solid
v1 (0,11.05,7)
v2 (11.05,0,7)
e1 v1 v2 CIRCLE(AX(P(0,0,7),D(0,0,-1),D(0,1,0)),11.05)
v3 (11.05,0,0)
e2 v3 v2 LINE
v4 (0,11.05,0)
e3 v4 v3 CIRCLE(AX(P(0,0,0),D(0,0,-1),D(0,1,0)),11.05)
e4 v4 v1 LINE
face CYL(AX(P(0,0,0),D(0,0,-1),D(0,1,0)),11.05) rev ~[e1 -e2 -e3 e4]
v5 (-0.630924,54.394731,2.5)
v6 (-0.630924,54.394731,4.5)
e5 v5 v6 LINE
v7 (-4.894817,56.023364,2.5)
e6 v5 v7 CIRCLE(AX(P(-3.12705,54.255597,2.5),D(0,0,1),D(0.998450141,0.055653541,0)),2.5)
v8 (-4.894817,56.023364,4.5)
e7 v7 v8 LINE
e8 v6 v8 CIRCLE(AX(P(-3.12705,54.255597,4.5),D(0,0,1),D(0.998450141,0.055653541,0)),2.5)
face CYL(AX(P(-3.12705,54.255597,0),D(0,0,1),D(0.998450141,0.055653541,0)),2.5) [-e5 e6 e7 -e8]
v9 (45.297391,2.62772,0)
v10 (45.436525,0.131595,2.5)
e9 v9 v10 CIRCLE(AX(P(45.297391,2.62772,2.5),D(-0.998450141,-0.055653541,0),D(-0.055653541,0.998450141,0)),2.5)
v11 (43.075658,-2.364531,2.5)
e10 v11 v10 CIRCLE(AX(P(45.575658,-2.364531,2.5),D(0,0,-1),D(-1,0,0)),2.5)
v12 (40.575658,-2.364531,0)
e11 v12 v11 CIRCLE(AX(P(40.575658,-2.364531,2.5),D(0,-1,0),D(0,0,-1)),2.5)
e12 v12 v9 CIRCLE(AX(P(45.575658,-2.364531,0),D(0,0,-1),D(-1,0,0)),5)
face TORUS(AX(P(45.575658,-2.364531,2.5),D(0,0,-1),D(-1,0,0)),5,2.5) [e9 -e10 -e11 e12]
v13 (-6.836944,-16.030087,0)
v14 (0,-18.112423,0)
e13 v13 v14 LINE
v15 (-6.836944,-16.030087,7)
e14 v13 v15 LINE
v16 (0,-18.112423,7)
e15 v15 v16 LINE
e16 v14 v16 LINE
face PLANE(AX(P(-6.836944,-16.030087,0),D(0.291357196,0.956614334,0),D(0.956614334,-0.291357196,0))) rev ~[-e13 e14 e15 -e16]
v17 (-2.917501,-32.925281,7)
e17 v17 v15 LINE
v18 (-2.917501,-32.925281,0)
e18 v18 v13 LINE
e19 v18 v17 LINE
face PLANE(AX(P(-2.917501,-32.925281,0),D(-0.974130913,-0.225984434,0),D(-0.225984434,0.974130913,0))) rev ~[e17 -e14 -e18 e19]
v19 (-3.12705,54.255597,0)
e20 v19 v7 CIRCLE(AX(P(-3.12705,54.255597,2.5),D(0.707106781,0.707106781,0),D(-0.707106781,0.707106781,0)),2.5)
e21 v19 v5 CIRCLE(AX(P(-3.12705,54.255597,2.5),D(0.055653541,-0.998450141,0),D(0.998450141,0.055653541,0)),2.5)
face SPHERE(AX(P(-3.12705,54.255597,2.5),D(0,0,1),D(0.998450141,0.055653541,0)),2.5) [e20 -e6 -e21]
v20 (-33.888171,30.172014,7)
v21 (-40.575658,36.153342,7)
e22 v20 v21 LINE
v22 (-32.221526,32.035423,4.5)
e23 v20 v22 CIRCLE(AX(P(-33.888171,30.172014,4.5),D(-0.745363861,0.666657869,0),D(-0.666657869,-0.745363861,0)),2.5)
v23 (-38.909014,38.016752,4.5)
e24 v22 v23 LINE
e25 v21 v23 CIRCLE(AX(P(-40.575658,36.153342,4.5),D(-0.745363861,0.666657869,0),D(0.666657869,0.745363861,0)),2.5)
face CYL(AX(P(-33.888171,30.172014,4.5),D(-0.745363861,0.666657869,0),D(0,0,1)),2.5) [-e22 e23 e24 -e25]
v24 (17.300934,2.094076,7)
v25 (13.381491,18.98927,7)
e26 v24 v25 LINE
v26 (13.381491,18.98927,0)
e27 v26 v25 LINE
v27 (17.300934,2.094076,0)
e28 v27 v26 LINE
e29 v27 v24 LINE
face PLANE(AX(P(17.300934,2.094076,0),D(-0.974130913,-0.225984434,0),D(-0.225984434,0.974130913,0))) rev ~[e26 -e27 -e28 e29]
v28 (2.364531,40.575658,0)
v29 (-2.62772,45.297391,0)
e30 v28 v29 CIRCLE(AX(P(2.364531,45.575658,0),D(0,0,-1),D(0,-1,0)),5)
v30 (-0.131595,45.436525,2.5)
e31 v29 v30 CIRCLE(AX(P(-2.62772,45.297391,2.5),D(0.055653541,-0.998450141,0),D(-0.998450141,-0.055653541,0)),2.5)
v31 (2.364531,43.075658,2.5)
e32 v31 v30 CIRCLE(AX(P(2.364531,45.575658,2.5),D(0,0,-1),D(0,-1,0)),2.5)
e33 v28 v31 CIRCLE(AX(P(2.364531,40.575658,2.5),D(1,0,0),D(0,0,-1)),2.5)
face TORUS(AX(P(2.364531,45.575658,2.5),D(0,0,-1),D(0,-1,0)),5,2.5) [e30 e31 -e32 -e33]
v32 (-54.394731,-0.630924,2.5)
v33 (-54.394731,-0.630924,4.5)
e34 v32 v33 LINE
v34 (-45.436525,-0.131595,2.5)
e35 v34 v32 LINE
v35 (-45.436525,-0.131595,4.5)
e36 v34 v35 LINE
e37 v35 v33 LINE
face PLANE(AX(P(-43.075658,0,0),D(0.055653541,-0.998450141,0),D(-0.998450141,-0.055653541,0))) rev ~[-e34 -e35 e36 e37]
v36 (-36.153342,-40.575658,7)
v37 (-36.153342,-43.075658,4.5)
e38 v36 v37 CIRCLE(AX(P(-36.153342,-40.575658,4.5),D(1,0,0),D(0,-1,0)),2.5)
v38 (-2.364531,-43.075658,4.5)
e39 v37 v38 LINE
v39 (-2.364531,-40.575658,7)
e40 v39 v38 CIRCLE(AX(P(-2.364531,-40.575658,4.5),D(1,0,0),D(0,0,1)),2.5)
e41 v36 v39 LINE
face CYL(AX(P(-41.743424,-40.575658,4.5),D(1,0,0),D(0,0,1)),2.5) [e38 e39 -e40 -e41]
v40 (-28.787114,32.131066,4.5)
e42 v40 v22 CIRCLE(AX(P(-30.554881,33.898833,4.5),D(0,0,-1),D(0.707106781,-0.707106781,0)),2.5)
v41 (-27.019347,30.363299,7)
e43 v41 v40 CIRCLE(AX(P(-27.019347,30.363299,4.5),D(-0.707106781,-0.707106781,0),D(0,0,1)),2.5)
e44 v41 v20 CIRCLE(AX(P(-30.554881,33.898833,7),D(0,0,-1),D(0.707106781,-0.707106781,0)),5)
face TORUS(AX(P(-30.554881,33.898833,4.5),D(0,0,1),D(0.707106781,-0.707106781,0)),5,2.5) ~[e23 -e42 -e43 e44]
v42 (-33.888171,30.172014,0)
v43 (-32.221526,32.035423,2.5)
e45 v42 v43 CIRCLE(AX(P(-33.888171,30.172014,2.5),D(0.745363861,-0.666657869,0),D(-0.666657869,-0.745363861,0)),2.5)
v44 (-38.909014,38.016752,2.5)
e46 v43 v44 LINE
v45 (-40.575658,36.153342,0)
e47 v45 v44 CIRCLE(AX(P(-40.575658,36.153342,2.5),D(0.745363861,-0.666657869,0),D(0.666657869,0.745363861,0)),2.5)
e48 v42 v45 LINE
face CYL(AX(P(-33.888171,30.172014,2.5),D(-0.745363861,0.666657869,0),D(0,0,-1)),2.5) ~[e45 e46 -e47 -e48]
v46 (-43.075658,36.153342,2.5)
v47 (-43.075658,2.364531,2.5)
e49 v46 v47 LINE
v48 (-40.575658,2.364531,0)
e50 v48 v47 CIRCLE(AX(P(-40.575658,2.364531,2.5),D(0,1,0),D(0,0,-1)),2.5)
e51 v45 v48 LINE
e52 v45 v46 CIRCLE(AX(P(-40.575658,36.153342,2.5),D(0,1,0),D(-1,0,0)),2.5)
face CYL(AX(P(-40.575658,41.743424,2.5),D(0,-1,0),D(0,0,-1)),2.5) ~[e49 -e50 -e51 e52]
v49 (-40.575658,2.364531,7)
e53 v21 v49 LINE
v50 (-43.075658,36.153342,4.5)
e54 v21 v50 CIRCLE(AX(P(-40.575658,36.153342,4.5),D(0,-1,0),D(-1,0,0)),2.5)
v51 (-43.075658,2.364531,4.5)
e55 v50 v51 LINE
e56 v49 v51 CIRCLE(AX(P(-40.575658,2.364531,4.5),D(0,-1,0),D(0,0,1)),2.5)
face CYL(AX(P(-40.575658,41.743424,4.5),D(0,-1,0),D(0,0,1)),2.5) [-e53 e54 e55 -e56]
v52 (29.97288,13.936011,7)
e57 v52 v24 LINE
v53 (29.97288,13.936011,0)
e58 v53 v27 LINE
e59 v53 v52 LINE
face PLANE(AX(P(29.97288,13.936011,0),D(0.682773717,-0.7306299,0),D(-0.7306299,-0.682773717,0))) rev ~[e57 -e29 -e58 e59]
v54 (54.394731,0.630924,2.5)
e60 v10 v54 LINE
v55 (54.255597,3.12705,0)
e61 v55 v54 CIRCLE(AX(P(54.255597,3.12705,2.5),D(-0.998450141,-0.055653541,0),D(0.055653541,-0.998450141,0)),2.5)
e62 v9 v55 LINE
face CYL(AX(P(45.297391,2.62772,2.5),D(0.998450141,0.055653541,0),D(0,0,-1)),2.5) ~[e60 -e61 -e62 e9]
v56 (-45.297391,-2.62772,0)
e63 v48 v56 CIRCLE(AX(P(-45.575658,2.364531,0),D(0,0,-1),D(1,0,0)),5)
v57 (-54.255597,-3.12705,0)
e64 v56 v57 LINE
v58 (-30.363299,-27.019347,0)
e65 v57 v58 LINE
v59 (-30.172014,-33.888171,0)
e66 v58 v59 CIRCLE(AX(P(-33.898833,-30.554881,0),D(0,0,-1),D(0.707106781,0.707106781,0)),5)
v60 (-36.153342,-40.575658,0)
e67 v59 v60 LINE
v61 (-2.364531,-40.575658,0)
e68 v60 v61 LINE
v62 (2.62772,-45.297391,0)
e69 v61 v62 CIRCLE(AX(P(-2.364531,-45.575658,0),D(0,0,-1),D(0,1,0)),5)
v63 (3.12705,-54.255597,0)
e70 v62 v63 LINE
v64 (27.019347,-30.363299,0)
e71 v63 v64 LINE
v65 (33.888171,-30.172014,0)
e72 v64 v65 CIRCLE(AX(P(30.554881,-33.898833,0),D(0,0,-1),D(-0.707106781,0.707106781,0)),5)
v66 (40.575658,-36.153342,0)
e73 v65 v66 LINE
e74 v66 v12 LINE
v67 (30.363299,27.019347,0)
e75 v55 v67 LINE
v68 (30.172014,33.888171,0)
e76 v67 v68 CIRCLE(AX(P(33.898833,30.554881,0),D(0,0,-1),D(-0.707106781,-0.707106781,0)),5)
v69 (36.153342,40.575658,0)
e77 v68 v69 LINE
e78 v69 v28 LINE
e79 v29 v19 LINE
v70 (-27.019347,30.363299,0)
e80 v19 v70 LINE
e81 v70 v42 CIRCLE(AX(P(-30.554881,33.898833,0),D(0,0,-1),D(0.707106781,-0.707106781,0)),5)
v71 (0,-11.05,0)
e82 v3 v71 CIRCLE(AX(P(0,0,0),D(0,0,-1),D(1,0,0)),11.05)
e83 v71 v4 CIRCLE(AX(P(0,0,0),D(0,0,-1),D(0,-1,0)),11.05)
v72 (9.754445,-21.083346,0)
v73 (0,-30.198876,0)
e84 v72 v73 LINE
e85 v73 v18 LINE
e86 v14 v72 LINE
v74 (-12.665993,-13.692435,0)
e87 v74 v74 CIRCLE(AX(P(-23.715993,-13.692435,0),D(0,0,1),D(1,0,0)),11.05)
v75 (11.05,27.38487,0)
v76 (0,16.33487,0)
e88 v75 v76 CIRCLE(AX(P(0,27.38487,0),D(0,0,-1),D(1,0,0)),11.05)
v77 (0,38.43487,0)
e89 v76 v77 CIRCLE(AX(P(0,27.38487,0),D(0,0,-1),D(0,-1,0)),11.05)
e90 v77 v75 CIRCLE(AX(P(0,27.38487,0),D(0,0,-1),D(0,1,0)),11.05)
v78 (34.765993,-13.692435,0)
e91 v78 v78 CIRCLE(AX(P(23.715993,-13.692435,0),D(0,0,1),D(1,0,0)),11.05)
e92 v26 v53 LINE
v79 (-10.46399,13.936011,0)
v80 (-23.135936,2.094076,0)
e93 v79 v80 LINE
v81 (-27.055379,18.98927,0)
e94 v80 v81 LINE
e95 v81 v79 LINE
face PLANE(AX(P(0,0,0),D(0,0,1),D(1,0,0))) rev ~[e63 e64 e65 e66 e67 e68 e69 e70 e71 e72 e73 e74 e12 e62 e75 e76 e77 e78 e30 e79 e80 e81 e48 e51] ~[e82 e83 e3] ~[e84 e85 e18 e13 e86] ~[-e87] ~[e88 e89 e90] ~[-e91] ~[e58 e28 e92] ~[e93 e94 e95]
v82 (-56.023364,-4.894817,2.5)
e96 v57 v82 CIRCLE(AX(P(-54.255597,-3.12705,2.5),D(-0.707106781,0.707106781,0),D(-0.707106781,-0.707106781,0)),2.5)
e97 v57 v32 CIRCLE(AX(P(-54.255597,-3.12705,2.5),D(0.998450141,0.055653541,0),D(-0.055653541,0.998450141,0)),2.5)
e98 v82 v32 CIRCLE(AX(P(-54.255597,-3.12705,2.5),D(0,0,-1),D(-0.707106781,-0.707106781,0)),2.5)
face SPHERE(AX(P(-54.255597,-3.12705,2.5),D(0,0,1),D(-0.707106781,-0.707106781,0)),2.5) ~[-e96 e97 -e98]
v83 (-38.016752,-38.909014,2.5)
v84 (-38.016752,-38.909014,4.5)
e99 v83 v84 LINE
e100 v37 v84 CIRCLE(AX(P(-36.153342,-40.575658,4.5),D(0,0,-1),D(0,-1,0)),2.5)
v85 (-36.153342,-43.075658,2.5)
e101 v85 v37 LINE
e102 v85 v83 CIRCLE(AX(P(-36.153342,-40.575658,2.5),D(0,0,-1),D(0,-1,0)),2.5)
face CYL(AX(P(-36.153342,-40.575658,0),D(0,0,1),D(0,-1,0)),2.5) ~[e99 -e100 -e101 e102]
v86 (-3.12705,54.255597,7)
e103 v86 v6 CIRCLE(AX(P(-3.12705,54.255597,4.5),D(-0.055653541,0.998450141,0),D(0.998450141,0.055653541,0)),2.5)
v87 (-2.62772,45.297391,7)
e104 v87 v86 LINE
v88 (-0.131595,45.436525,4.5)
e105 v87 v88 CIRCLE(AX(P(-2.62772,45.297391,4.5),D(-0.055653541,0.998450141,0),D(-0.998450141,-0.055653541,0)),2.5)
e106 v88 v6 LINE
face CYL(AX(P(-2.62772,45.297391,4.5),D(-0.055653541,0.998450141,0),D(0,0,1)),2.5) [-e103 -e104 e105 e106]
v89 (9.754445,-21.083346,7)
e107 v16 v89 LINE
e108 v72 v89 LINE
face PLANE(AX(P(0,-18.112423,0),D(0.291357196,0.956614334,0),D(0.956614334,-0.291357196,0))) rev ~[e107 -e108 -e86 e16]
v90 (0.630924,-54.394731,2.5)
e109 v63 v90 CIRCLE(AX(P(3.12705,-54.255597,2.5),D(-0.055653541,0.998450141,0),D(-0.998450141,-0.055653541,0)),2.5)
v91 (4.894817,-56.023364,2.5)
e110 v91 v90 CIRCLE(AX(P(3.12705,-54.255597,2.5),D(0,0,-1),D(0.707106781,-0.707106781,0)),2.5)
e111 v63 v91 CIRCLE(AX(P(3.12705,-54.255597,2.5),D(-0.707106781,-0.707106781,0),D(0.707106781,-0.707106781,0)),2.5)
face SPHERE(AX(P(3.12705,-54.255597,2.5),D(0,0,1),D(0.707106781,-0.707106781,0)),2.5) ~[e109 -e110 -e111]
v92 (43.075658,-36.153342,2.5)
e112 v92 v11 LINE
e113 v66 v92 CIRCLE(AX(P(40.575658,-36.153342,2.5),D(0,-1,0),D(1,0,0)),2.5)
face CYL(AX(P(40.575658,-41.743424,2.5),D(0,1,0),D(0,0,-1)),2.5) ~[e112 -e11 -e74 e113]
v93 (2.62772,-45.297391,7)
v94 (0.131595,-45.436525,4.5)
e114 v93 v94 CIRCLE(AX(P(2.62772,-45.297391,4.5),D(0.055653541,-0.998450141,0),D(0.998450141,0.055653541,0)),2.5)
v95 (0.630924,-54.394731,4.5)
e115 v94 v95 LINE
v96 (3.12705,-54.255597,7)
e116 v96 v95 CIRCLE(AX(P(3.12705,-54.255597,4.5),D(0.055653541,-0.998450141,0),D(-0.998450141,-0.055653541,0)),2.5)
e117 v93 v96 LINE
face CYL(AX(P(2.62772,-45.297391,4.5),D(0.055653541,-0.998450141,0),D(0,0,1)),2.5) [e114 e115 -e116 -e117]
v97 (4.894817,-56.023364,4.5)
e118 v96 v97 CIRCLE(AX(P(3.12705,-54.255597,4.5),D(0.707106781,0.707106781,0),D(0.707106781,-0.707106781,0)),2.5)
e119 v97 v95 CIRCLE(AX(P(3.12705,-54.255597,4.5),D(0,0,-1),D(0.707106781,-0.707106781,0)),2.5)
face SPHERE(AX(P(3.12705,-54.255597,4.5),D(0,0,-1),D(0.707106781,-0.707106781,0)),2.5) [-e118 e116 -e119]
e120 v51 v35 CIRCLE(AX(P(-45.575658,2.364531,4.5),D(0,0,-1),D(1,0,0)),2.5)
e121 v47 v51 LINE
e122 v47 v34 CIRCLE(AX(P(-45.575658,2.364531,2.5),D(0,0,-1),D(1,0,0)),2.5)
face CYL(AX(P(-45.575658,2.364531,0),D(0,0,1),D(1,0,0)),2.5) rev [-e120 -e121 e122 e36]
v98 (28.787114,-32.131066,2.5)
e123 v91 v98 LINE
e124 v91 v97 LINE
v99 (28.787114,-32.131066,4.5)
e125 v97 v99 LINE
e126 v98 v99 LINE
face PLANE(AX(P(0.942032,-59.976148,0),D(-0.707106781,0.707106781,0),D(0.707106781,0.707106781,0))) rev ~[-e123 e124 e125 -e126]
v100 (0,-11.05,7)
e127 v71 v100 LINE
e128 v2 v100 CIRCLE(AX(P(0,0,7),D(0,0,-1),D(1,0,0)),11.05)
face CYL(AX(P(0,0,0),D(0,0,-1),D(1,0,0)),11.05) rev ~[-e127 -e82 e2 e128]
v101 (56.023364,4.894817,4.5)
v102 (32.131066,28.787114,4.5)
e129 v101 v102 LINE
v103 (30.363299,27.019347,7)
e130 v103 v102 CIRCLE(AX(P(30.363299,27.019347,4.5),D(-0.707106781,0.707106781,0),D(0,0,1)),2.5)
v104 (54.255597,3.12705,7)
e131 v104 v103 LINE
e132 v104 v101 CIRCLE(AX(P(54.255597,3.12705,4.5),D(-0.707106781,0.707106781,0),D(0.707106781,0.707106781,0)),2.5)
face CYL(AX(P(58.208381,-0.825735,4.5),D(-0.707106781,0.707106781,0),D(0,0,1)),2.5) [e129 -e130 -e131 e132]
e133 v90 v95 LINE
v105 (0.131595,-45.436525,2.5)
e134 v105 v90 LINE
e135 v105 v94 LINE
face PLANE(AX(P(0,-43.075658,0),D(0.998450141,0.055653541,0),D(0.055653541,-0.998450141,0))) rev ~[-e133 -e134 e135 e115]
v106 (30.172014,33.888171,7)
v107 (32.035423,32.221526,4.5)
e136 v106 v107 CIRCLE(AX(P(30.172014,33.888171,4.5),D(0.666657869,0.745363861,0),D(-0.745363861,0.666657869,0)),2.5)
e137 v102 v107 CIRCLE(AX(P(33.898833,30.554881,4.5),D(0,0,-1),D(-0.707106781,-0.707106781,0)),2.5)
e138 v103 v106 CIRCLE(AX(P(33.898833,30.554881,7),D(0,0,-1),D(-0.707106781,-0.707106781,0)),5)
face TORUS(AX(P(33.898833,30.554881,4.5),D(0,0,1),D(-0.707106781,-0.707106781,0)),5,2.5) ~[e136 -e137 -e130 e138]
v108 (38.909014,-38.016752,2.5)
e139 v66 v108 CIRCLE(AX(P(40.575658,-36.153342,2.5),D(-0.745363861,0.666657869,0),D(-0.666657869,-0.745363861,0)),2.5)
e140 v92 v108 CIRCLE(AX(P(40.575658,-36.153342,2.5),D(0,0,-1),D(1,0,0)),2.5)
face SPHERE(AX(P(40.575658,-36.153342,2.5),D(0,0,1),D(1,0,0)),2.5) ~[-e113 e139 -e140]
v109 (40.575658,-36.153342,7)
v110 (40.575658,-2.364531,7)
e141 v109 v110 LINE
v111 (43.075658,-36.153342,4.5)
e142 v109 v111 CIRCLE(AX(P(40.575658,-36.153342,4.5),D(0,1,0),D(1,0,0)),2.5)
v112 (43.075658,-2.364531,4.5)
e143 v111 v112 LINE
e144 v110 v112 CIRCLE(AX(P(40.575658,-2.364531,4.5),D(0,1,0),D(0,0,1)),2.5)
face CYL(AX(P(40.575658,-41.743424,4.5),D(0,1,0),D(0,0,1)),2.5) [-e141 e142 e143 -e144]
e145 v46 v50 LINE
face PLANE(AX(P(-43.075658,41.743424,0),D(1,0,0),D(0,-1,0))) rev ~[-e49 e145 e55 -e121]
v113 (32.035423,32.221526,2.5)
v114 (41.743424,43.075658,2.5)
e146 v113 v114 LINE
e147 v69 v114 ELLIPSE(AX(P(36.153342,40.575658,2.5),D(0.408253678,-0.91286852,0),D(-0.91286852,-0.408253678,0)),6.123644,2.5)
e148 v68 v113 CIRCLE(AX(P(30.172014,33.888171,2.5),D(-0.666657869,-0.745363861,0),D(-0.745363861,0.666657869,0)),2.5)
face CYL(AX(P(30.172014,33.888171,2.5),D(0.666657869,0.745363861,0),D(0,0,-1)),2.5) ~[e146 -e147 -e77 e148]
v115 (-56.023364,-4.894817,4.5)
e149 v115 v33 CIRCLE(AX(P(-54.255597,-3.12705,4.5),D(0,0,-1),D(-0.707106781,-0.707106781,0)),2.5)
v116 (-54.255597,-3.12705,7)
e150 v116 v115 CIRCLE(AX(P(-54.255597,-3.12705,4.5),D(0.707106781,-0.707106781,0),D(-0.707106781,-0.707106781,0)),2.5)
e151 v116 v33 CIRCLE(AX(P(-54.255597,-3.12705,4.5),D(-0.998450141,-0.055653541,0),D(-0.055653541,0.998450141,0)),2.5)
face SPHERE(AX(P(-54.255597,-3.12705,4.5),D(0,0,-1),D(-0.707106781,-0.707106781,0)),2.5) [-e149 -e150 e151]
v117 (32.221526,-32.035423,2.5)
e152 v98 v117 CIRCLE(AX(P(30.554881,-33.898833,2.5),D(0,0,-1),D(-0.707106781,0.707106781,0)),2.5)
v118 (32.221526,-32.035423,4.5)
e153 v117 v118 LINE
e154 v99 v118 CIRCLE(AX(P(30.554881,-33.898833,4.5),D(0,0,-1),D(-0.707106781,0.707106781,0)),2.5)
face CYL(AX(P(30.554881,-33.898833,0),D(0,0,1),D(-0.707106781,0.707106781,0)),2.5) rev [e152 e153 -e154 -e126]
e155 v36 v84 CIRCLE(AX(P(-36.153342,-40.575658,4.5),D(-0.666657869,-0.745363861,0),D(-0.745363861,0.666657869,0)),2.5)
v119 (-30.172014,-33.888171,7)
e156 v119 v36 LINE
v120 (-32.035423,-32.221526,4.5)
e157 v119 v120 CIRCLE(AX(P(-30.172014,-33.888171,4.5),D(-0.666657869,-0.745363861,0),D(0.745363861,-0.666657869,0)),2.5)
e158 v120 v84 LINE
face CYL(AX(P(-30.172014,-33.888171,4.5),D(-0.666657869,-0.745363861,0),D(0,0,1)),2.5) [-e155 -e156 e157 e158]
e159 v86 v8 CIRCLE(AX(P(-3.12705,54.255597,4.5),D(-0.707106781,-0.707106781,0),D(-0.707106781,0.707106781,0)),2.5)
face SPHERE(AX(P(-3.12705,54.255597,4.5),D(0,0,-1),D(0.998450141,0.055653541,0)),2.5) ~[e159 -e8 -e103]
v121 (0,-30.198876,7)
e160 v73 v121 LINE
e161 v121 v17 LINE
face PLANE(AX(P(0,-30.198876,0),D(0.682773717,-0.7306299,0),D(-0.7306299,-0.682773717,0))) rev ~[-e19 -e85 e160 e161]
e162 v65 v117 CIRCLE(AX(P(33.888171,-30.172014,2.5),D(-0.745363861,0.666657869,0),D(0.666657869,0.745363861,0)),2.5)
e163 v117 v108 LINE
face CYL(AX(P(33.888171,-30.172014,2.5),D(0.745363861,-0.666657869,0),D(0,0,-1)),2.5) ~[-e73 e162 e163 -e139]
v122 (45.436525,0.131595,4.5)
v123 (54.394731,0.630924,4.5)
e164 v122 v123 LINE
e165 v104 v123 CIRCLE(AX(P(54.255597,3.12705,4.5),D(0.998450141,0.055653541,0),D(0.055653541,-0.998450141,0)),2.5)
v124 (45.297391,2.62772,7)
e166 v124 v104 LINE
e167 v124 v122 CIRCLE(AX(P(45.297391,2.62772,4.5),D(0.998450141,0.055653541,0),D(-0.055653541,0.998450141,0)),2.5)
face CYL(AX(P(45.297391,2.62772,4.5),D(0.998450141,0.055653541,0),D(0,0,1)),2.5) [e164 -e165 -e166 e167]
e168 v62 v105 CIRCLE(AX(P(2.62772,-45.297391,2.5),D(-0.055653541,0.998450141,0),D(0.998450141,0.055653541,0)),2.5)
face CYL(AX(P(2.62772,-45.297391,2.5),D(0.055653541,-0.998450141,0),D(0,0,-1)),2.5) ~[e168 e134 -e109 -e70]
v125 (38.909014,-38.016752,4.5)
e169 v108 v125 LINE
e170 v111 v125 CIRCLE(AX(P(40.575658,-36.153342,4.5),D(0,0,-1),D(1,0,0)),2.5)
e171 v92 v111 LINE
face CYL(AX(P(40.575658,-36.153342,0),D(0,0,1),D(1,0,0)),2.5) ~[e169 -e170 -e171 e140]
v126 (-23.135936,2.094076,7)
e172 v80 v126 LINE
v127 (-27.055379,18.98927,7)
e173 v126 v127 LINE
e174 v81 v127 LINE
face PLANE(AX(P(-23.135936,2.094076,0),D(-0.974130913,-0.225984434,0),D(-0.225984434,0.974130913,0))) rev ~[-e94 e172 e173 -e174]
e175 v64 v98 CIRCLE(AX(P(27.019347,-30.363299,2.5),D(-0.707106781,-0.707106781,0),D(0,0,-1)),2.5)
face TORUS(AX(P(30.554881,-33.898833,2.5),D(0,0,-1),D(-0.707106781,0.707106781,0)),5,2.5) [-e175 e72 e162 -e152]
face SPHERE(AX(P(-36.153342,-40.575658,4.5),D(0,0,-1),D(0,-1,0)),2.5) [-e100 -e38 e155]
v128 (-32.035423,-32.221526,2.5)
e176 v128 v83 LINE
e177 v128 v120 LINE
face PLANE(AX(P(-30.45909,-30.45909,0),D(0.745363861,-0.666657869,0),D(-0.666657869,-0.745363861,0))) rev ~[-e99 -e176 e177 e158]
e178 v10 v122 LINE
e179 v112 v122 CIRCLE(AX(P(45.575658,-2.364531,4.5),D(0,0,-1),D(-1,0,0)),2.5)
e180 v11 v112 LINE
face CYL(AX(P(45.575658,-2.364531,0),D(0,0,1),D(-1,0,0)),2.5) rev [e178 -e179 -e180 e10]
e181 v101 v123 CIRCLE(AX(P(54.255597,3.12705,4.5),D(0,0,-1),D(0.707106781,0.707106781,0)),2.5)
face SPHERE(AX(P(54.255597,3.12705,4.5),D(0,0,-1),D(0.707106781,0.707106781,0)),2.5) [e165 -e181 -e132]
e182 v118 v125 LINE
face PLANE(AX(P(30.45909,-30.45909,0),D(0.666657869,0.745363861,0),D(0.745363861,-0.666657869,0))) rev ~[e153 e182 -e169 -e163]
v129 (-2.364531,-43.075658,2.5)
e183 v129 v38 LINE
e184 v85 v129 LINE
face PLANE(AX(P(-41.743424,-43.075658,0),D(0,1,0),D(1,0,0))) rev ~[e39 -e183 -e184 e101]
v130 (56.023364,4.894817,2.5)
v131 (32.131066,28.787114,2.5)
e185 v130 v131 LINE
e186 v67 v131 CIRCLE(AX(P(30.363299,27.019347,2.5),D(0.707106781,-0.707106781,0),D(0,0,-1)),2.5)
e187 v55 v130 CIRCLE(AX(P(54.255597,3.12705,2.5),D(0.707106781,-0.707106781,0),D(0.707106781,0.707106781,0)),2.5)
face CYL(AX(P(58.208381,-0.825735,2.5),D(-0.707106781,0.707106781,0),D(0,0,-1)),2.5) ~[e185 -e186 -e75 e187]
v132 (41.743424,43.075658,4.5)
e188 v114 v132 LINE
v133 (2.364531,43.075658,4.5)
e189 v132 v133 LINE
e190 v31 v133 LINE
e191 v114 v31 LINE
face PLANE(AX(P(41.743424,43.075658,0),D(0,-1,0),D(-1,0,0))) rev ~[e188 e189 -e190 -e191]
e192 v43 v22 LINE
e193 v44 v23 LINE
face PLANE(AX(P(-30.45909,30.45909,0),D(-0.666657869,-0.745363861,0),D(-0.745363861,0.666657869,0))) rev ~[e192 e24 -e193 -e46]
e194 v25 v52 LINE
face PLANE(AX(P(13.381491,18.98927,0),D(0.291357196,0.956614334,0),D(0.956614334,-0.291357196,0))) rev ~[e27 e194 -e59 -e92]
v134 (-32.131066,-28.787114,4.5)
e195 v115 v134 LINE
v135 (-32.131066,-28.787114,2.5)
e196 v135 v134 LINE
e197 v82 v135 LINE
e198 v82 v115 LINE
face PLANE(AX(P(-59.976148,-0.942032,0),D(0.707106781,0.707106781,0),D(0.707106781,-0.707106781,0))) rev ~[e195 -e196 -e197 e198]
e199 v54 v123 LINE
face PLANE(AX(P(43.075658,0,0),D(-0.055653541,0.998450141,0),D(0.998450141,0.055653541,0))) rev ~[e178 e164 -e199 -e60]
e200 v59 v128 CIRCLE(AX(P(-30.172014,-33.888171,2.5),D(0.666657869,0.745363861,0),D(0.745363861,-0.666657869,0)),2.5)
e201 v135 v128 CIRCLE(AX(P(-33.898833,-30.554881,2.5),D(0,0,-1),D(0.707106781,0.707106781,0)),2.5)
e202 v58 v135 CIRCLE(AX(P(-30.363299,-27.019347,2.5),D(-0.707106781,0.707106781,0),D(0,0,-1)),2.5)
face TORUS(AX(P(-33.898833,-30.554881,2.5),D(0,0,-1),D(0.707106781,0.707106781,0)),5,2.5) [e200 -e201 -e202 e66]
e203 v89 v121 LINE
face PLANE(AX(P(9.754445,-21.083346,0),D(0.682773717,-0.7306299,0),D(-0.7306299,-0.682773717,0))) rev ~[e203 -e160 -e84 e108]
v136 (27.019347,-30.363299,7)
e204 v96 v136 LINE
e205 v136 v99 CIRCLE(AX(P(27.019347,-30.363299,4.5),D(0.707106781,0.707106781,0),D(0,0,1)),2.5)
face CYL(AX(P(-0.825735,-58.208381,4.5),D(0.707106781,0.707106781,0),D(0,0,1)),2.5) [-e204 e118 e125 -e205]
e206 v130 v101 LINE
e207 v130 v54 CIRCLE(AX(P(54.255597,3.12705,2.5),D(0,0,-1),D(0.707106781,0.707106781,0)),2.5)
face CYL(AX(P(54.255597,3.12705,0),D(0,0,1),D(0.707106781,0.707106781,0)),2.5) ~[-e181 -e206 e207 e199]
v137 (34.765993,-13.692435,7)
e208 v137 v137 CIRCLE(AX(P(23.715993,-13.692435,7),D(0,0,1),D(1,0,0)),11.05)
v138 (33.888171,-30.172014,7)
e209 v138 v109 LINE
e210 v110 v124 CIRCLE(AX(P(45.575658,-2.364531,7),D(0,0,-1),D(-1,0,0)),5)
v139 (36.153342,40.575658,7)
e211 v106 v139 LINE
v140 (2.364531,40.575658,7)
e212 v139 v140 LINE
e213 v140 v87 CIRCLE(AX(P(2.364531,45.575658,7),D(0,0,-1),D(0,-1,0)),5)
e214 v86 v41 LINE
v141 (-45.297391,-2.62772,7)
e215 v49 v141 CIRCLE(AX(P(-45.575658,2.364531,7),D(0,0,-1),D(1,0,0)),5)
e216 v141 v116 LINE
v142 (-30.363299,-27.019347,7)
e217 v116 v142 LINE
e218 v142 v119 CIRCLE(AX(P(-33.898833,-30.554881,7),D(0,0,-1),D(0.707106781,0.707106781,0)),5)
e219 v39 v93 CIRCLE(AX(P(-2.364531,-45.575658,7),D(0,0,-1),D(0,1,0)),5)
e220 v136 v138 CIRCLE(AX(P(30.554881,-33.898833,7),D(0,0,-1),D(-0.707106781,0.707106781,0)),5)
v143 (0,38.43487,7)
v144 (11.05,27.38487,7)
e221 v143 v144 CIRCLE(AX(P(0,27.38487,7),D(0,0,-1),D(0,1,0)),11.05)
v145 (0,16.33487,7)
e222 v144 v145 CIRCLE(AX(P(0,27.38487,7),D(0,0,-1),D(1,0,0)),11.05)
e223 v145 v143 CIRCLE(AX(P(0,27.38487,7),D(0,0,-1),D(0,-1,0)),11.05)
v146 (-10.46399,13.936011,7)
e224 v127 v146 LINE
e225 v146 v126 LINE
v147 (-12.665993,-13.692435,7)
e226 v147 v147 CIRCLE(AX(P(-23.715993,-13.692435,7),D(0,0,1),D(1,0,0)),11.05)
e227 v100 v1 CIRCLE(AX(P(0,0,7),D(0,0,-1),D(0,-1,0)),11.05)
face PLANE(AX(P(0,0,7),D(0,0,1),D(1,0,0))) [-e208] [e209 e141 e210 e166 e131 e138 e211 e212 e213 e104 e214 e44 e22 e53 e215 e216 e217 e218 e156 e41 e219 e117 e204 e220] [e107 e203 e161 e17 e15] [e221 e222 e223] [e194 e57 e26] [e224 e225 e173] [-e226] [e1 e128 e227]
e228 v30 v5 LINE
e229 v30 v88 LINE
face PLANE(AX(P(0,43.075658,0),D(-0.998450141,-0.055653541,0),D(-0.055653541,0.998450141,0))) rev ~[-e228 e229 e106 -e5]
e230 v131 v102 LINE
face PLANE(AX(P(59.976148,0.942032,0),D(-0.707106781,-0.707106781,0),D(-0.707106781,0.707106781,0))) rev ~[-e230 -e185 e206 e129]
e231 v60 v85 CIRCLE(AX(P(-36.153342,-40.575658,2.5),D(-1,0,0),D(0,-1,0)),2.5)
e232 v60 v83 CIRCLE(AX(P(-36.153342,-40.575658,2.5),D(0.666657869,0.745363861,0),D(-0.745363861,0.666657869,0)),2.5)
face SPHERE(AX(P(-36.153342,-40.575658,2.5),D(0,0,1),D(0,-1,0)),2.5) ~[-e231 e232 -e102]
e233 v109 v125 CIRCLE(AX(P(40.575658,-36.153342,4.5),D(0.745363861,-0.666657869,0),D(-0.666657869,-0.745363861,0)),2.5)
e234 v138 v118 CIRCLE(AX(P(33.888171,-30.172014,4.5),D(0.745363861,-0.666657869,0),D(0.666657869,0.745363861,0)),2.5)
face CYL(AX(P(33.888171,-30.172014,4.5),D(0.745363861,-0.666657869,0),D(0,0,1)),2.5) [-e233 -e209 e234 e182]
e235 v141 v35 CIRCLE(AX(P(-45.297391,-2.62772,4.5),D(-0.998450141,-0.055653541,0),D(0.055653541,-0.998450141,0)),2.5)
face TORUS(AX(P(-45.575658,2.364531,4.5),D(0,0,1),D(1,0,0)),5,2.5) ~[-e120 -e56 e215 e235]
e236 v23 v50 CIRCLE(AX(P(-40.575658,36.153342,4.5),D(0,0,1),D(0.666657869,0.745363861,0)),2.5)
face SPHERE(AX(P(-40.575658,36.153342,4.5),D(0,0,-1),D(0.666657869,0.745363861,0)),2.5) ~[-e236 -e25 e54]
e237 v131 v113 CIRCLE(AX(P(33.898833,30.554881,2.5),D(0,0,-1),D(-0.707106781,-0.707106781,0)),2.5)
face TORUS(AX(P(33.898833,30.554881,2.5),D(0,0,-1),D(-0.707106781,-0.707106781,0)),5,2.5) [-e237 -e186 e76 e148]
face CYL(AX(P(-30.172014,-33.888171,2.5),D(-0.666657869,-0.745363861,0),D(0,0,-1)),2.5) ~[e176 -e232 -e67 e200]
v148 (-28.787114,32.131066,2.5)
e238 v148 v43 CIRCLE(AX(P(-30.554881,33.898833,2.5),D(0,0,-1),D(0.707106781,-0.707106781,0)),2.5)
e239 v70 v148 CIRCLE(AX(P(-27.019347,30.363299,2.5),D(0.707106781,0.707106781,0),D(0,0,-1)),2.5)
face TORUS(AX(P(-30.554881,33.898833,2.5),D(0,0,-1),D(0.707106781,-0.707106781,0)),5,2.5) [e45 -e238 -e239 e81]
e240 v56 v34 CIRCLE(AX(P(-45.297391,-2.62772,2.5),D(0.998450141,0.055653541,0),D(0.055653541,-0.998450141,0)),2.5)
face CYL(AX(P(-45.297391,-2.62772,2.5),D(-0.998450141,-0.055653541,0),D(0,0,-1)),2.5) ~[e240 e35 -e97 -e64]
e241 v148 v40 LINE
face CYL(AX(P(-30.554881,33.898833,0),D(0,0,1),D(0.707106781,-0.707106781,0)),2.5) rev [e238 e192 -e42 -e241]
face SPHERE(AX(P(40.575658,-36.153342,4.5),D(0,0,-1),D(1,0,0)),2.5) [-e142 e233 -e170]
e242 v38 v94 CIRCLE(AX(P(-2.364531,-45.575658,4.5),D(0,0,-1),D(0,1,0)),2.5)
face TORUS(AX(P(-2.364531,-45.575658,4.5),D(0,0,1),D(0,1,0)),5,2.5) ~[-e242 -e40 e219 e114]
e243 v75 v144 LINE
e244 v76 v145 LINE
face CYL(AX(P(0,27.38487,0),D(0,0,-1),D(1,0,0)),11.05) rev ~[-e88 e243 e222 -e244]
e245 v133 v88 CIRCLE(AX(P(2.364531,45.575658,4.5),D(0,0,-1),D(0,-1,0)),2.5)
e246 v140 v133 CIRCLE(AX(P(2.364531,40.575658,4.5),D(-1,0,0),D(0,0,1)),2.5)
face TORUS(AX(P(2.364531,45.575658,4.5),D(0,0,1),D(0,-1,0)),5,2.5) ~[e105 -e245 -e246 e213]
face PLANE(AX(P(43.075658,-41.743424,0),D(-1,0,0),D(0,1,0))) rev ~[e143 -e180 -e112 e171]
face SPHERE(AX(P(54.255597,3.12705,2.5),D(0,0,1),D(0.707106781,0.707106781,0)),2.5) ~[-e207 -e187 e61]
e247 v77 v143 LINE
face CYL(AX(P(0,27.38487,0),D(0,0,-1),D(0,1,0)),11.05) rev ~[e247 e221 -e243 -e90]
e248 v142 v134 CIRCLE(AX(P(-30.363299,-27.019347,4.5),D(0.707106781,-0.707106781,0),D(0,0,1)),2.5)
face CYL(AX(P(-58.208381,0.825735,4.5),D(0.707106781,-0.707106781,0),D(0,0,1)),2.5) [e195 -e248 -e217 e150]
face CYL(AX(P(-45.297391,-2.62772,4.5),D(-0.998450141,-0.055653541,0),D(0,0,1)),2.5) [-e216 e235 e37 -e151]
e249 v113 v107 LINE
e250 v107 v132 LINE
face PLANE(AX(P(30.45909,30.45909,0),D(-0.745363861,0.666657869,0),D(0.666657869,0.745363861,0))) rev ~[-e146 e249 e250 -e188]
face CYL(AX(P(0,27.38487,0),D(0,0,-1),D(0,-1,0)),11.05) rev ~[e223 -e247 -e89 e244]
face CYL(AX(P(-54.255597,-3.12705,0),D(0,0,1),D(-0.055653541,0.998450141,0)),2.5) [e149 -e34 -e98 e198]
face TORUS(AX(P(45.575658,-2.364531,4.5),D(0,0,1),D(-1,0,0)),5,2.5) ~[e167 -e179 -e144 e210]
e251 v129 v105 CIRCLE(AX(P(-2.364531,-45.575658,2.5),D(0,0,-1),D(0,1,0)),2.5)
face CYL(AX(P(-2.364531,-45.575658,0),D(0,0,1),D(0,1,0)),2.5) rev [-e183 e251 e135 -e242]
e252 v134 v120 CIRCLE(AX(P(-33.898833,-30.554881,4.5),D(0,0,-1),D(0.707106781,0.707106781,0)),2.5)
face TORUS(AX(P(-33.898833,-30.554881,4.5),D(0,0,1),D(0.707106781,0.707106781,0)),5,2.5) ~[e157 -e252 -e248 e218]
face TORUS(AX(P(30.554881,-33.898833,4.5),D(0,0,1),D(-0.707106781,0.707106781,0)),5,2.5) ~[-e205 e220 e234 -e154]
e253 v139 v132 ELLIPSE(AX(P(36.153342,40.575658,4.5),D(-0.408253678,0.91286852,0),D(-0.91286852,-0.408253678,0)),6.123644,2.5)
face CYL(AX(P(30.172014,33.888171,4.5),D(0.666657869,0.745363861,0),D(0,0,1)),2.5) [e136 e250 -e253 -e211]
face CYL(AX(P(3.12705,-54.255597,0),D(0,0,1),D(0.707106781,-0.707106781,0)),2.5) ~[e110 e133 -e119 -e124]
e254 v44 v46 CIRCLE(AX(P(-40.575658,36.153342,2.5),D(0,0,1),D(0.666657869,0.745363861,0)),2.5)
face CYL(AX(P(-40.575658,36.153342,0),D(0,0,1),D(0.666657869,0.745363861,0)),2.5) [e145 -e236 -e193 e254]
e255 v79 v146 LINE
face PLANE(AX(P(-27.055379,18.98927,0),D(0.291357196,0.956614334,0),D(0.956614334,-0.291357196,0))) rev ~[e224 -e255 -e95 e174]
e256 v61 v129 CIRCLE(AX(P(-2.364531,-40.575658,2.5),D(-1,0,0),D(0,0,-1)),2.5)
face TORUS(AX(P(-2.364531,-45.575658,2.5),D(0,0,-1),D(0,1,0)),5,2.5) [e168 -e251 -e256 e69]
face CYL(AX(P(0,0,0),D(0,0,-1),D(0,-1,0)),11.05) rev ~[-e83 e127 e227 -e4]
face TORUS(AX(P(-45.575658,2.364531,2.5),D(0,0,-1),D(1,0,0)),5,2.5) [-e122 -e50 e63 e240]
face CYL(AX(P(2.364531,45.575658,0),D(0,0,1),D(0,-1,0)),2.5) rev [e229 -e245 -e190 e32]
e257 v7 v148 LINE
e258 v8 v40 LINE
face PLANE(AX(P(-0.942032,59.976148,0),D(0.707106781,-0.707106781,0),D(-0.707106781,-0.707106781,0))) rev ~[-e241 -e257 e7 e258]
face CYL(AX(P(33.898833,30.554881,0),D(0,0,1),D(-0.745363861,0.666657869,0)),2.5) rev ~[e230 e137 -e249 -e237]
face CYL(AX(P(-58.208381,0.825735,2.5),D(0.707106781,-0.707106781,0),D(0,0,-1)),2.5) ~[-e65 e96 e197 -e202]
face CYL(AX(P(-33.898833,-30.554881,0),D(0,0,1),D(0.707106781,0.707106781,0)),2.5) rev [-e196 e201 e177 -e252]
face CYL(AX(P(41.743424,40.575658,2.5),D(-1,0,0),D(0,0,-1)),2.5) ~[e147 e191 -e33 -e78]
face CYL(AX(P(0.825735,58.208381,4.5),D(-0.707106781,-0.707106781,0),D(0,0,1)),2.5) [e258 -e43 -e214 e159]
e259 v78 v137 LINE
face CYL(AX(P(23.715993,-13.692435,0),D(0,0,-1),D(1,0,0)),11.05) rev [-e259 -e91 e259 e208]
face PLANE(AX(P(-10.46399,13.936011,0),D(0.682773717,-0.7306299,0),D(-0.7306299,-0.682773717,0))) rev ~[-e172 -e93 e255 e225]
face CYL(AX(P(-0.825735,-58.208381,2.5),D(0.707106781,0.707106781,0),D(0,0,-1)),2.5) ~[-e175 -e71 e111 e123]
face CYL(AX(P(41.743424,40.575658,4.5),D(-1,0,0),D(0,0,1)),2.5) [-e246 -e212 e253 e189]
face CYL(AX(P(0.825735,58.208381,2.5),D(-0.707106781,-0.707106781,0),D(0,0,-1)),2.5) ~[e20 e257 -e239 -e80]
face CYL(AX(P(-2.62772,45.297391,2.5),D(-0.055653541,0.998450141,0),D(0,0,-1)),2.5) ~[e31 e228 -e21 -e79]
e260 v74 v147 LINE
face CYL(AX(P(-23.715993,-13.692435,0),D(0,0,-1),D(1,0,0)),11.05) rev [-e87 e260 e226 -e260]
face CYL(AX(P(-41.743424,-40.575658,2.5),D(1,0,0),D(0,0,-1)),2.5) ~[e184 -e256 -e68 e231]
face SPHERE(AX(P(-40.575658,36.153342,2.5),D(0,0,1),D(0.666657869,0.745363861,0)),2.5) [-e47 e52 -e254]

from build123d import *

# Parameters (mm, degrees)
F0_R     = 11.05
F1_DEPTH = 7
F2_F1_R  = 2.5
F2_F2_R  = 2.5


with BuildPart() as f1:
    # F0 (on Top) → F1 (new body)
    with BuildSketch(Plane.XY):
        Polygon((-30.4590901453, -30.4590901453), (0, -43.075658381), (30.4590901453, -30.4590901453), (43.075658381, 0), (30.4590901453, 30.4590901453), (0, 43.075658381), (-30.4590901453, 30.4590901453), (-43.075658381, 0), align=None)
        with Locations((-23.7159928866, -13.6924348772)):
            Circle(F0_R, mode=Mode.SUBTRACT)
        with BuildLine():
            ThreePointArc((0, 11.05), (7.8135299321, 7.8135299321), (11.05, 0))
            ThreePointArc((11.05, 0), (7.8135299321, -7.8135299321), (0, -11.05))
            ThreePointArc((0, -11.05), (-11.05, 0), (0, 11.05))
        make_face(mode=Mode.SUBTRACT)
        Polygon((-6.8369439754, -16.0300867214), (0, -18.1124230949), (9.7544447129, -21.0833462298), (0, -30.1988758228), (-2.9175007375, -32.9252805637), align=None, mode=Mode.SUBTRACT)
        with Locations((23.7159928866, -13.6924348772)):
            Circle(F0_R, mode=Mode.SUBTRACT)
        Polygon((-27.0553790261, 18.989270036), (-10.4639903379, 13.9360105276), (-23.1359357882, 2.0940761937), align=None, mode=Mode.SUBTRACT)
        with BuildLine():
            ThreePointArc((11.05, 27.3848697543), (7.8135299321, 19.5713398222), (0, 16.3348697543))
            ThreePointArc((0, 16.3348697543), (-11.05, 27.3848697543), (0, 38.4348697543))
            ThreePointArc((0, 38.4348697543), (7.8135299321, 35.1983996864), (11.05, 27.3848697543))
        make_face(mode=Mode.SUBTRACT)
        Polygon((13.3814910753, 18.989270036), (29.9728797636, 13.9360105276), (17.3009343133, 2.0940761937), align=None, mode=Mode.SUBTRACT)
        Polygon((-0.9420321136, 59.9761481769), (-30.4590901453, 30.4590901453), (0, 43.075658381), align=None)
        Polygon((-43.075658381, 41.7434237897), (-43.075658381, 0), (-30.4590901453, 30.4590901453), align=None)
        Polygon((-59.9761481769, -0.9420321136), (-30.4590901453, -30.4590901453), (-43.075658381, 0), align=None)
        Polygon((0, 43.075658381), (30.4590901453, 30.4590901453), (41.7434237897, 43.075658381), align=None)
        Polygon((-41.7434237897, -43.075658381), (0, -43.075658381), (-30.4590901453, -30.4590901453), align=None)
        Polygon((30.4590901453, -30.4590901453), (0, -43.075658381), (0.9420321136, -59.9761481769), align=None)
        Polygon((43.075658381, 0), (30.4590901453, -30.4590901453), (43.075658381, -41.7434237897), align=None)
        Polygon((30.4590901453, 30.4590901453), (43.075658381, 0), (59.9761481769, 0.9420321136), align=None)
    extrude(amount=F1_DEPTH)

    # F2: fillet of radius 2.5 on 31 edges, made by hand

    # F2_f1
    f2_f1_edges = [f1.edges().sort_by_distance(p)[0] for p in [
        (-30.4590901453, 30.4590901453, 3.5),
        (0, 43.075658381, 3.5),
        (30.4590901453, 30.4590901453, 3.5),
        (43.075658381, 0, 3.5),
        (30.4590901453, -30.4590901453, 3.5),
        (0, -43.075658381, 3.5),
        (-30.4590901453, -30.4590901453, 3.5),
        (-43.075658381, 0, 3.5),
    ]]
    fillet(f2_f1_edges, radius=F2_F1_R)

    # F2_f2
    f2_f2_edges = [f1.edges().sort_by_distance(p)[0] for p in [
        (-43.075658381, 41.7434237897, 3.5),
        (-37.6485921809, 36.8894235126, 0),
        (-37.6485921809, 36.8894235126, 7),
        (-0.9420321136, 59.9761481769, 3.5),
        (-0.5368133134, 52.7063363531, 0),
        (-0.5368133134, 52.7063363531, 7),
        (59.9761481769, 0.9420321136, 3.5),
        (46.0536070562, 14.8645732343, 0),
        (46.0536070562, 14.8645732343, 7),
        (43.075658381, -41.7434237897, 3.5),
        (43.075658381, -22.0539773141, 0),
        (43.075658381, -22.0539773141, 7),
        (0.9420321136, -59.9761481769, 3.5),
        (14.8645732343, -46.0536070562, 0),
        (14.8645732343, -46.0536070562, 7),
        (-41.7434237897, -43.075658381, 3.5),
        (-22.0539773141, -43.075658381, 0),
        (-22.0539773141, -43.075658381, 7),
        (-59.9761481769, -0.9420321136, 3.5),
        (-46.0536070562, -14.8645732343, 0),
        (-46.0536070562, -14.8645732343, 7),
        (-43.075658381, 22.0539773141, 0),
        (-43.075658381, 22.0539773141, 7),
        (-43.7593661923, 0.6466592818, 7),
        (-43.7593661923, 0.6466592818, 0),
        (-31.3998017383, -30.4852874118, 7),
        (-31.3998017383, -30.4852874118, 0),
        (-0.6466592818, -43.7593661923, 7),
        (-0.6466592818, -43.7593661923, 0),
        (30.4852874118, -31.3998017383, 7),
        (30.4852874118, -31.3998017383, 0),
        (43.7593661923, -0.6466592818, 7),
        (43.7593661923, -0.6466592818, 0),
        (31.3998017383, 30.4852874118, 7),
        (31.3998017383, 30.4852874118, 0),
        (0.6466592818, 43.7593661923, 7),
        (0.6466592818, 43.7593661923, 0),
        (-30.4852874118, 31.3998017383, 7),
        (-30.4852874118, 31.3998017383, 0),
    ]]
    fillet(f2_f2_edges, radius=F2_F2_R)


solid = f1.part
